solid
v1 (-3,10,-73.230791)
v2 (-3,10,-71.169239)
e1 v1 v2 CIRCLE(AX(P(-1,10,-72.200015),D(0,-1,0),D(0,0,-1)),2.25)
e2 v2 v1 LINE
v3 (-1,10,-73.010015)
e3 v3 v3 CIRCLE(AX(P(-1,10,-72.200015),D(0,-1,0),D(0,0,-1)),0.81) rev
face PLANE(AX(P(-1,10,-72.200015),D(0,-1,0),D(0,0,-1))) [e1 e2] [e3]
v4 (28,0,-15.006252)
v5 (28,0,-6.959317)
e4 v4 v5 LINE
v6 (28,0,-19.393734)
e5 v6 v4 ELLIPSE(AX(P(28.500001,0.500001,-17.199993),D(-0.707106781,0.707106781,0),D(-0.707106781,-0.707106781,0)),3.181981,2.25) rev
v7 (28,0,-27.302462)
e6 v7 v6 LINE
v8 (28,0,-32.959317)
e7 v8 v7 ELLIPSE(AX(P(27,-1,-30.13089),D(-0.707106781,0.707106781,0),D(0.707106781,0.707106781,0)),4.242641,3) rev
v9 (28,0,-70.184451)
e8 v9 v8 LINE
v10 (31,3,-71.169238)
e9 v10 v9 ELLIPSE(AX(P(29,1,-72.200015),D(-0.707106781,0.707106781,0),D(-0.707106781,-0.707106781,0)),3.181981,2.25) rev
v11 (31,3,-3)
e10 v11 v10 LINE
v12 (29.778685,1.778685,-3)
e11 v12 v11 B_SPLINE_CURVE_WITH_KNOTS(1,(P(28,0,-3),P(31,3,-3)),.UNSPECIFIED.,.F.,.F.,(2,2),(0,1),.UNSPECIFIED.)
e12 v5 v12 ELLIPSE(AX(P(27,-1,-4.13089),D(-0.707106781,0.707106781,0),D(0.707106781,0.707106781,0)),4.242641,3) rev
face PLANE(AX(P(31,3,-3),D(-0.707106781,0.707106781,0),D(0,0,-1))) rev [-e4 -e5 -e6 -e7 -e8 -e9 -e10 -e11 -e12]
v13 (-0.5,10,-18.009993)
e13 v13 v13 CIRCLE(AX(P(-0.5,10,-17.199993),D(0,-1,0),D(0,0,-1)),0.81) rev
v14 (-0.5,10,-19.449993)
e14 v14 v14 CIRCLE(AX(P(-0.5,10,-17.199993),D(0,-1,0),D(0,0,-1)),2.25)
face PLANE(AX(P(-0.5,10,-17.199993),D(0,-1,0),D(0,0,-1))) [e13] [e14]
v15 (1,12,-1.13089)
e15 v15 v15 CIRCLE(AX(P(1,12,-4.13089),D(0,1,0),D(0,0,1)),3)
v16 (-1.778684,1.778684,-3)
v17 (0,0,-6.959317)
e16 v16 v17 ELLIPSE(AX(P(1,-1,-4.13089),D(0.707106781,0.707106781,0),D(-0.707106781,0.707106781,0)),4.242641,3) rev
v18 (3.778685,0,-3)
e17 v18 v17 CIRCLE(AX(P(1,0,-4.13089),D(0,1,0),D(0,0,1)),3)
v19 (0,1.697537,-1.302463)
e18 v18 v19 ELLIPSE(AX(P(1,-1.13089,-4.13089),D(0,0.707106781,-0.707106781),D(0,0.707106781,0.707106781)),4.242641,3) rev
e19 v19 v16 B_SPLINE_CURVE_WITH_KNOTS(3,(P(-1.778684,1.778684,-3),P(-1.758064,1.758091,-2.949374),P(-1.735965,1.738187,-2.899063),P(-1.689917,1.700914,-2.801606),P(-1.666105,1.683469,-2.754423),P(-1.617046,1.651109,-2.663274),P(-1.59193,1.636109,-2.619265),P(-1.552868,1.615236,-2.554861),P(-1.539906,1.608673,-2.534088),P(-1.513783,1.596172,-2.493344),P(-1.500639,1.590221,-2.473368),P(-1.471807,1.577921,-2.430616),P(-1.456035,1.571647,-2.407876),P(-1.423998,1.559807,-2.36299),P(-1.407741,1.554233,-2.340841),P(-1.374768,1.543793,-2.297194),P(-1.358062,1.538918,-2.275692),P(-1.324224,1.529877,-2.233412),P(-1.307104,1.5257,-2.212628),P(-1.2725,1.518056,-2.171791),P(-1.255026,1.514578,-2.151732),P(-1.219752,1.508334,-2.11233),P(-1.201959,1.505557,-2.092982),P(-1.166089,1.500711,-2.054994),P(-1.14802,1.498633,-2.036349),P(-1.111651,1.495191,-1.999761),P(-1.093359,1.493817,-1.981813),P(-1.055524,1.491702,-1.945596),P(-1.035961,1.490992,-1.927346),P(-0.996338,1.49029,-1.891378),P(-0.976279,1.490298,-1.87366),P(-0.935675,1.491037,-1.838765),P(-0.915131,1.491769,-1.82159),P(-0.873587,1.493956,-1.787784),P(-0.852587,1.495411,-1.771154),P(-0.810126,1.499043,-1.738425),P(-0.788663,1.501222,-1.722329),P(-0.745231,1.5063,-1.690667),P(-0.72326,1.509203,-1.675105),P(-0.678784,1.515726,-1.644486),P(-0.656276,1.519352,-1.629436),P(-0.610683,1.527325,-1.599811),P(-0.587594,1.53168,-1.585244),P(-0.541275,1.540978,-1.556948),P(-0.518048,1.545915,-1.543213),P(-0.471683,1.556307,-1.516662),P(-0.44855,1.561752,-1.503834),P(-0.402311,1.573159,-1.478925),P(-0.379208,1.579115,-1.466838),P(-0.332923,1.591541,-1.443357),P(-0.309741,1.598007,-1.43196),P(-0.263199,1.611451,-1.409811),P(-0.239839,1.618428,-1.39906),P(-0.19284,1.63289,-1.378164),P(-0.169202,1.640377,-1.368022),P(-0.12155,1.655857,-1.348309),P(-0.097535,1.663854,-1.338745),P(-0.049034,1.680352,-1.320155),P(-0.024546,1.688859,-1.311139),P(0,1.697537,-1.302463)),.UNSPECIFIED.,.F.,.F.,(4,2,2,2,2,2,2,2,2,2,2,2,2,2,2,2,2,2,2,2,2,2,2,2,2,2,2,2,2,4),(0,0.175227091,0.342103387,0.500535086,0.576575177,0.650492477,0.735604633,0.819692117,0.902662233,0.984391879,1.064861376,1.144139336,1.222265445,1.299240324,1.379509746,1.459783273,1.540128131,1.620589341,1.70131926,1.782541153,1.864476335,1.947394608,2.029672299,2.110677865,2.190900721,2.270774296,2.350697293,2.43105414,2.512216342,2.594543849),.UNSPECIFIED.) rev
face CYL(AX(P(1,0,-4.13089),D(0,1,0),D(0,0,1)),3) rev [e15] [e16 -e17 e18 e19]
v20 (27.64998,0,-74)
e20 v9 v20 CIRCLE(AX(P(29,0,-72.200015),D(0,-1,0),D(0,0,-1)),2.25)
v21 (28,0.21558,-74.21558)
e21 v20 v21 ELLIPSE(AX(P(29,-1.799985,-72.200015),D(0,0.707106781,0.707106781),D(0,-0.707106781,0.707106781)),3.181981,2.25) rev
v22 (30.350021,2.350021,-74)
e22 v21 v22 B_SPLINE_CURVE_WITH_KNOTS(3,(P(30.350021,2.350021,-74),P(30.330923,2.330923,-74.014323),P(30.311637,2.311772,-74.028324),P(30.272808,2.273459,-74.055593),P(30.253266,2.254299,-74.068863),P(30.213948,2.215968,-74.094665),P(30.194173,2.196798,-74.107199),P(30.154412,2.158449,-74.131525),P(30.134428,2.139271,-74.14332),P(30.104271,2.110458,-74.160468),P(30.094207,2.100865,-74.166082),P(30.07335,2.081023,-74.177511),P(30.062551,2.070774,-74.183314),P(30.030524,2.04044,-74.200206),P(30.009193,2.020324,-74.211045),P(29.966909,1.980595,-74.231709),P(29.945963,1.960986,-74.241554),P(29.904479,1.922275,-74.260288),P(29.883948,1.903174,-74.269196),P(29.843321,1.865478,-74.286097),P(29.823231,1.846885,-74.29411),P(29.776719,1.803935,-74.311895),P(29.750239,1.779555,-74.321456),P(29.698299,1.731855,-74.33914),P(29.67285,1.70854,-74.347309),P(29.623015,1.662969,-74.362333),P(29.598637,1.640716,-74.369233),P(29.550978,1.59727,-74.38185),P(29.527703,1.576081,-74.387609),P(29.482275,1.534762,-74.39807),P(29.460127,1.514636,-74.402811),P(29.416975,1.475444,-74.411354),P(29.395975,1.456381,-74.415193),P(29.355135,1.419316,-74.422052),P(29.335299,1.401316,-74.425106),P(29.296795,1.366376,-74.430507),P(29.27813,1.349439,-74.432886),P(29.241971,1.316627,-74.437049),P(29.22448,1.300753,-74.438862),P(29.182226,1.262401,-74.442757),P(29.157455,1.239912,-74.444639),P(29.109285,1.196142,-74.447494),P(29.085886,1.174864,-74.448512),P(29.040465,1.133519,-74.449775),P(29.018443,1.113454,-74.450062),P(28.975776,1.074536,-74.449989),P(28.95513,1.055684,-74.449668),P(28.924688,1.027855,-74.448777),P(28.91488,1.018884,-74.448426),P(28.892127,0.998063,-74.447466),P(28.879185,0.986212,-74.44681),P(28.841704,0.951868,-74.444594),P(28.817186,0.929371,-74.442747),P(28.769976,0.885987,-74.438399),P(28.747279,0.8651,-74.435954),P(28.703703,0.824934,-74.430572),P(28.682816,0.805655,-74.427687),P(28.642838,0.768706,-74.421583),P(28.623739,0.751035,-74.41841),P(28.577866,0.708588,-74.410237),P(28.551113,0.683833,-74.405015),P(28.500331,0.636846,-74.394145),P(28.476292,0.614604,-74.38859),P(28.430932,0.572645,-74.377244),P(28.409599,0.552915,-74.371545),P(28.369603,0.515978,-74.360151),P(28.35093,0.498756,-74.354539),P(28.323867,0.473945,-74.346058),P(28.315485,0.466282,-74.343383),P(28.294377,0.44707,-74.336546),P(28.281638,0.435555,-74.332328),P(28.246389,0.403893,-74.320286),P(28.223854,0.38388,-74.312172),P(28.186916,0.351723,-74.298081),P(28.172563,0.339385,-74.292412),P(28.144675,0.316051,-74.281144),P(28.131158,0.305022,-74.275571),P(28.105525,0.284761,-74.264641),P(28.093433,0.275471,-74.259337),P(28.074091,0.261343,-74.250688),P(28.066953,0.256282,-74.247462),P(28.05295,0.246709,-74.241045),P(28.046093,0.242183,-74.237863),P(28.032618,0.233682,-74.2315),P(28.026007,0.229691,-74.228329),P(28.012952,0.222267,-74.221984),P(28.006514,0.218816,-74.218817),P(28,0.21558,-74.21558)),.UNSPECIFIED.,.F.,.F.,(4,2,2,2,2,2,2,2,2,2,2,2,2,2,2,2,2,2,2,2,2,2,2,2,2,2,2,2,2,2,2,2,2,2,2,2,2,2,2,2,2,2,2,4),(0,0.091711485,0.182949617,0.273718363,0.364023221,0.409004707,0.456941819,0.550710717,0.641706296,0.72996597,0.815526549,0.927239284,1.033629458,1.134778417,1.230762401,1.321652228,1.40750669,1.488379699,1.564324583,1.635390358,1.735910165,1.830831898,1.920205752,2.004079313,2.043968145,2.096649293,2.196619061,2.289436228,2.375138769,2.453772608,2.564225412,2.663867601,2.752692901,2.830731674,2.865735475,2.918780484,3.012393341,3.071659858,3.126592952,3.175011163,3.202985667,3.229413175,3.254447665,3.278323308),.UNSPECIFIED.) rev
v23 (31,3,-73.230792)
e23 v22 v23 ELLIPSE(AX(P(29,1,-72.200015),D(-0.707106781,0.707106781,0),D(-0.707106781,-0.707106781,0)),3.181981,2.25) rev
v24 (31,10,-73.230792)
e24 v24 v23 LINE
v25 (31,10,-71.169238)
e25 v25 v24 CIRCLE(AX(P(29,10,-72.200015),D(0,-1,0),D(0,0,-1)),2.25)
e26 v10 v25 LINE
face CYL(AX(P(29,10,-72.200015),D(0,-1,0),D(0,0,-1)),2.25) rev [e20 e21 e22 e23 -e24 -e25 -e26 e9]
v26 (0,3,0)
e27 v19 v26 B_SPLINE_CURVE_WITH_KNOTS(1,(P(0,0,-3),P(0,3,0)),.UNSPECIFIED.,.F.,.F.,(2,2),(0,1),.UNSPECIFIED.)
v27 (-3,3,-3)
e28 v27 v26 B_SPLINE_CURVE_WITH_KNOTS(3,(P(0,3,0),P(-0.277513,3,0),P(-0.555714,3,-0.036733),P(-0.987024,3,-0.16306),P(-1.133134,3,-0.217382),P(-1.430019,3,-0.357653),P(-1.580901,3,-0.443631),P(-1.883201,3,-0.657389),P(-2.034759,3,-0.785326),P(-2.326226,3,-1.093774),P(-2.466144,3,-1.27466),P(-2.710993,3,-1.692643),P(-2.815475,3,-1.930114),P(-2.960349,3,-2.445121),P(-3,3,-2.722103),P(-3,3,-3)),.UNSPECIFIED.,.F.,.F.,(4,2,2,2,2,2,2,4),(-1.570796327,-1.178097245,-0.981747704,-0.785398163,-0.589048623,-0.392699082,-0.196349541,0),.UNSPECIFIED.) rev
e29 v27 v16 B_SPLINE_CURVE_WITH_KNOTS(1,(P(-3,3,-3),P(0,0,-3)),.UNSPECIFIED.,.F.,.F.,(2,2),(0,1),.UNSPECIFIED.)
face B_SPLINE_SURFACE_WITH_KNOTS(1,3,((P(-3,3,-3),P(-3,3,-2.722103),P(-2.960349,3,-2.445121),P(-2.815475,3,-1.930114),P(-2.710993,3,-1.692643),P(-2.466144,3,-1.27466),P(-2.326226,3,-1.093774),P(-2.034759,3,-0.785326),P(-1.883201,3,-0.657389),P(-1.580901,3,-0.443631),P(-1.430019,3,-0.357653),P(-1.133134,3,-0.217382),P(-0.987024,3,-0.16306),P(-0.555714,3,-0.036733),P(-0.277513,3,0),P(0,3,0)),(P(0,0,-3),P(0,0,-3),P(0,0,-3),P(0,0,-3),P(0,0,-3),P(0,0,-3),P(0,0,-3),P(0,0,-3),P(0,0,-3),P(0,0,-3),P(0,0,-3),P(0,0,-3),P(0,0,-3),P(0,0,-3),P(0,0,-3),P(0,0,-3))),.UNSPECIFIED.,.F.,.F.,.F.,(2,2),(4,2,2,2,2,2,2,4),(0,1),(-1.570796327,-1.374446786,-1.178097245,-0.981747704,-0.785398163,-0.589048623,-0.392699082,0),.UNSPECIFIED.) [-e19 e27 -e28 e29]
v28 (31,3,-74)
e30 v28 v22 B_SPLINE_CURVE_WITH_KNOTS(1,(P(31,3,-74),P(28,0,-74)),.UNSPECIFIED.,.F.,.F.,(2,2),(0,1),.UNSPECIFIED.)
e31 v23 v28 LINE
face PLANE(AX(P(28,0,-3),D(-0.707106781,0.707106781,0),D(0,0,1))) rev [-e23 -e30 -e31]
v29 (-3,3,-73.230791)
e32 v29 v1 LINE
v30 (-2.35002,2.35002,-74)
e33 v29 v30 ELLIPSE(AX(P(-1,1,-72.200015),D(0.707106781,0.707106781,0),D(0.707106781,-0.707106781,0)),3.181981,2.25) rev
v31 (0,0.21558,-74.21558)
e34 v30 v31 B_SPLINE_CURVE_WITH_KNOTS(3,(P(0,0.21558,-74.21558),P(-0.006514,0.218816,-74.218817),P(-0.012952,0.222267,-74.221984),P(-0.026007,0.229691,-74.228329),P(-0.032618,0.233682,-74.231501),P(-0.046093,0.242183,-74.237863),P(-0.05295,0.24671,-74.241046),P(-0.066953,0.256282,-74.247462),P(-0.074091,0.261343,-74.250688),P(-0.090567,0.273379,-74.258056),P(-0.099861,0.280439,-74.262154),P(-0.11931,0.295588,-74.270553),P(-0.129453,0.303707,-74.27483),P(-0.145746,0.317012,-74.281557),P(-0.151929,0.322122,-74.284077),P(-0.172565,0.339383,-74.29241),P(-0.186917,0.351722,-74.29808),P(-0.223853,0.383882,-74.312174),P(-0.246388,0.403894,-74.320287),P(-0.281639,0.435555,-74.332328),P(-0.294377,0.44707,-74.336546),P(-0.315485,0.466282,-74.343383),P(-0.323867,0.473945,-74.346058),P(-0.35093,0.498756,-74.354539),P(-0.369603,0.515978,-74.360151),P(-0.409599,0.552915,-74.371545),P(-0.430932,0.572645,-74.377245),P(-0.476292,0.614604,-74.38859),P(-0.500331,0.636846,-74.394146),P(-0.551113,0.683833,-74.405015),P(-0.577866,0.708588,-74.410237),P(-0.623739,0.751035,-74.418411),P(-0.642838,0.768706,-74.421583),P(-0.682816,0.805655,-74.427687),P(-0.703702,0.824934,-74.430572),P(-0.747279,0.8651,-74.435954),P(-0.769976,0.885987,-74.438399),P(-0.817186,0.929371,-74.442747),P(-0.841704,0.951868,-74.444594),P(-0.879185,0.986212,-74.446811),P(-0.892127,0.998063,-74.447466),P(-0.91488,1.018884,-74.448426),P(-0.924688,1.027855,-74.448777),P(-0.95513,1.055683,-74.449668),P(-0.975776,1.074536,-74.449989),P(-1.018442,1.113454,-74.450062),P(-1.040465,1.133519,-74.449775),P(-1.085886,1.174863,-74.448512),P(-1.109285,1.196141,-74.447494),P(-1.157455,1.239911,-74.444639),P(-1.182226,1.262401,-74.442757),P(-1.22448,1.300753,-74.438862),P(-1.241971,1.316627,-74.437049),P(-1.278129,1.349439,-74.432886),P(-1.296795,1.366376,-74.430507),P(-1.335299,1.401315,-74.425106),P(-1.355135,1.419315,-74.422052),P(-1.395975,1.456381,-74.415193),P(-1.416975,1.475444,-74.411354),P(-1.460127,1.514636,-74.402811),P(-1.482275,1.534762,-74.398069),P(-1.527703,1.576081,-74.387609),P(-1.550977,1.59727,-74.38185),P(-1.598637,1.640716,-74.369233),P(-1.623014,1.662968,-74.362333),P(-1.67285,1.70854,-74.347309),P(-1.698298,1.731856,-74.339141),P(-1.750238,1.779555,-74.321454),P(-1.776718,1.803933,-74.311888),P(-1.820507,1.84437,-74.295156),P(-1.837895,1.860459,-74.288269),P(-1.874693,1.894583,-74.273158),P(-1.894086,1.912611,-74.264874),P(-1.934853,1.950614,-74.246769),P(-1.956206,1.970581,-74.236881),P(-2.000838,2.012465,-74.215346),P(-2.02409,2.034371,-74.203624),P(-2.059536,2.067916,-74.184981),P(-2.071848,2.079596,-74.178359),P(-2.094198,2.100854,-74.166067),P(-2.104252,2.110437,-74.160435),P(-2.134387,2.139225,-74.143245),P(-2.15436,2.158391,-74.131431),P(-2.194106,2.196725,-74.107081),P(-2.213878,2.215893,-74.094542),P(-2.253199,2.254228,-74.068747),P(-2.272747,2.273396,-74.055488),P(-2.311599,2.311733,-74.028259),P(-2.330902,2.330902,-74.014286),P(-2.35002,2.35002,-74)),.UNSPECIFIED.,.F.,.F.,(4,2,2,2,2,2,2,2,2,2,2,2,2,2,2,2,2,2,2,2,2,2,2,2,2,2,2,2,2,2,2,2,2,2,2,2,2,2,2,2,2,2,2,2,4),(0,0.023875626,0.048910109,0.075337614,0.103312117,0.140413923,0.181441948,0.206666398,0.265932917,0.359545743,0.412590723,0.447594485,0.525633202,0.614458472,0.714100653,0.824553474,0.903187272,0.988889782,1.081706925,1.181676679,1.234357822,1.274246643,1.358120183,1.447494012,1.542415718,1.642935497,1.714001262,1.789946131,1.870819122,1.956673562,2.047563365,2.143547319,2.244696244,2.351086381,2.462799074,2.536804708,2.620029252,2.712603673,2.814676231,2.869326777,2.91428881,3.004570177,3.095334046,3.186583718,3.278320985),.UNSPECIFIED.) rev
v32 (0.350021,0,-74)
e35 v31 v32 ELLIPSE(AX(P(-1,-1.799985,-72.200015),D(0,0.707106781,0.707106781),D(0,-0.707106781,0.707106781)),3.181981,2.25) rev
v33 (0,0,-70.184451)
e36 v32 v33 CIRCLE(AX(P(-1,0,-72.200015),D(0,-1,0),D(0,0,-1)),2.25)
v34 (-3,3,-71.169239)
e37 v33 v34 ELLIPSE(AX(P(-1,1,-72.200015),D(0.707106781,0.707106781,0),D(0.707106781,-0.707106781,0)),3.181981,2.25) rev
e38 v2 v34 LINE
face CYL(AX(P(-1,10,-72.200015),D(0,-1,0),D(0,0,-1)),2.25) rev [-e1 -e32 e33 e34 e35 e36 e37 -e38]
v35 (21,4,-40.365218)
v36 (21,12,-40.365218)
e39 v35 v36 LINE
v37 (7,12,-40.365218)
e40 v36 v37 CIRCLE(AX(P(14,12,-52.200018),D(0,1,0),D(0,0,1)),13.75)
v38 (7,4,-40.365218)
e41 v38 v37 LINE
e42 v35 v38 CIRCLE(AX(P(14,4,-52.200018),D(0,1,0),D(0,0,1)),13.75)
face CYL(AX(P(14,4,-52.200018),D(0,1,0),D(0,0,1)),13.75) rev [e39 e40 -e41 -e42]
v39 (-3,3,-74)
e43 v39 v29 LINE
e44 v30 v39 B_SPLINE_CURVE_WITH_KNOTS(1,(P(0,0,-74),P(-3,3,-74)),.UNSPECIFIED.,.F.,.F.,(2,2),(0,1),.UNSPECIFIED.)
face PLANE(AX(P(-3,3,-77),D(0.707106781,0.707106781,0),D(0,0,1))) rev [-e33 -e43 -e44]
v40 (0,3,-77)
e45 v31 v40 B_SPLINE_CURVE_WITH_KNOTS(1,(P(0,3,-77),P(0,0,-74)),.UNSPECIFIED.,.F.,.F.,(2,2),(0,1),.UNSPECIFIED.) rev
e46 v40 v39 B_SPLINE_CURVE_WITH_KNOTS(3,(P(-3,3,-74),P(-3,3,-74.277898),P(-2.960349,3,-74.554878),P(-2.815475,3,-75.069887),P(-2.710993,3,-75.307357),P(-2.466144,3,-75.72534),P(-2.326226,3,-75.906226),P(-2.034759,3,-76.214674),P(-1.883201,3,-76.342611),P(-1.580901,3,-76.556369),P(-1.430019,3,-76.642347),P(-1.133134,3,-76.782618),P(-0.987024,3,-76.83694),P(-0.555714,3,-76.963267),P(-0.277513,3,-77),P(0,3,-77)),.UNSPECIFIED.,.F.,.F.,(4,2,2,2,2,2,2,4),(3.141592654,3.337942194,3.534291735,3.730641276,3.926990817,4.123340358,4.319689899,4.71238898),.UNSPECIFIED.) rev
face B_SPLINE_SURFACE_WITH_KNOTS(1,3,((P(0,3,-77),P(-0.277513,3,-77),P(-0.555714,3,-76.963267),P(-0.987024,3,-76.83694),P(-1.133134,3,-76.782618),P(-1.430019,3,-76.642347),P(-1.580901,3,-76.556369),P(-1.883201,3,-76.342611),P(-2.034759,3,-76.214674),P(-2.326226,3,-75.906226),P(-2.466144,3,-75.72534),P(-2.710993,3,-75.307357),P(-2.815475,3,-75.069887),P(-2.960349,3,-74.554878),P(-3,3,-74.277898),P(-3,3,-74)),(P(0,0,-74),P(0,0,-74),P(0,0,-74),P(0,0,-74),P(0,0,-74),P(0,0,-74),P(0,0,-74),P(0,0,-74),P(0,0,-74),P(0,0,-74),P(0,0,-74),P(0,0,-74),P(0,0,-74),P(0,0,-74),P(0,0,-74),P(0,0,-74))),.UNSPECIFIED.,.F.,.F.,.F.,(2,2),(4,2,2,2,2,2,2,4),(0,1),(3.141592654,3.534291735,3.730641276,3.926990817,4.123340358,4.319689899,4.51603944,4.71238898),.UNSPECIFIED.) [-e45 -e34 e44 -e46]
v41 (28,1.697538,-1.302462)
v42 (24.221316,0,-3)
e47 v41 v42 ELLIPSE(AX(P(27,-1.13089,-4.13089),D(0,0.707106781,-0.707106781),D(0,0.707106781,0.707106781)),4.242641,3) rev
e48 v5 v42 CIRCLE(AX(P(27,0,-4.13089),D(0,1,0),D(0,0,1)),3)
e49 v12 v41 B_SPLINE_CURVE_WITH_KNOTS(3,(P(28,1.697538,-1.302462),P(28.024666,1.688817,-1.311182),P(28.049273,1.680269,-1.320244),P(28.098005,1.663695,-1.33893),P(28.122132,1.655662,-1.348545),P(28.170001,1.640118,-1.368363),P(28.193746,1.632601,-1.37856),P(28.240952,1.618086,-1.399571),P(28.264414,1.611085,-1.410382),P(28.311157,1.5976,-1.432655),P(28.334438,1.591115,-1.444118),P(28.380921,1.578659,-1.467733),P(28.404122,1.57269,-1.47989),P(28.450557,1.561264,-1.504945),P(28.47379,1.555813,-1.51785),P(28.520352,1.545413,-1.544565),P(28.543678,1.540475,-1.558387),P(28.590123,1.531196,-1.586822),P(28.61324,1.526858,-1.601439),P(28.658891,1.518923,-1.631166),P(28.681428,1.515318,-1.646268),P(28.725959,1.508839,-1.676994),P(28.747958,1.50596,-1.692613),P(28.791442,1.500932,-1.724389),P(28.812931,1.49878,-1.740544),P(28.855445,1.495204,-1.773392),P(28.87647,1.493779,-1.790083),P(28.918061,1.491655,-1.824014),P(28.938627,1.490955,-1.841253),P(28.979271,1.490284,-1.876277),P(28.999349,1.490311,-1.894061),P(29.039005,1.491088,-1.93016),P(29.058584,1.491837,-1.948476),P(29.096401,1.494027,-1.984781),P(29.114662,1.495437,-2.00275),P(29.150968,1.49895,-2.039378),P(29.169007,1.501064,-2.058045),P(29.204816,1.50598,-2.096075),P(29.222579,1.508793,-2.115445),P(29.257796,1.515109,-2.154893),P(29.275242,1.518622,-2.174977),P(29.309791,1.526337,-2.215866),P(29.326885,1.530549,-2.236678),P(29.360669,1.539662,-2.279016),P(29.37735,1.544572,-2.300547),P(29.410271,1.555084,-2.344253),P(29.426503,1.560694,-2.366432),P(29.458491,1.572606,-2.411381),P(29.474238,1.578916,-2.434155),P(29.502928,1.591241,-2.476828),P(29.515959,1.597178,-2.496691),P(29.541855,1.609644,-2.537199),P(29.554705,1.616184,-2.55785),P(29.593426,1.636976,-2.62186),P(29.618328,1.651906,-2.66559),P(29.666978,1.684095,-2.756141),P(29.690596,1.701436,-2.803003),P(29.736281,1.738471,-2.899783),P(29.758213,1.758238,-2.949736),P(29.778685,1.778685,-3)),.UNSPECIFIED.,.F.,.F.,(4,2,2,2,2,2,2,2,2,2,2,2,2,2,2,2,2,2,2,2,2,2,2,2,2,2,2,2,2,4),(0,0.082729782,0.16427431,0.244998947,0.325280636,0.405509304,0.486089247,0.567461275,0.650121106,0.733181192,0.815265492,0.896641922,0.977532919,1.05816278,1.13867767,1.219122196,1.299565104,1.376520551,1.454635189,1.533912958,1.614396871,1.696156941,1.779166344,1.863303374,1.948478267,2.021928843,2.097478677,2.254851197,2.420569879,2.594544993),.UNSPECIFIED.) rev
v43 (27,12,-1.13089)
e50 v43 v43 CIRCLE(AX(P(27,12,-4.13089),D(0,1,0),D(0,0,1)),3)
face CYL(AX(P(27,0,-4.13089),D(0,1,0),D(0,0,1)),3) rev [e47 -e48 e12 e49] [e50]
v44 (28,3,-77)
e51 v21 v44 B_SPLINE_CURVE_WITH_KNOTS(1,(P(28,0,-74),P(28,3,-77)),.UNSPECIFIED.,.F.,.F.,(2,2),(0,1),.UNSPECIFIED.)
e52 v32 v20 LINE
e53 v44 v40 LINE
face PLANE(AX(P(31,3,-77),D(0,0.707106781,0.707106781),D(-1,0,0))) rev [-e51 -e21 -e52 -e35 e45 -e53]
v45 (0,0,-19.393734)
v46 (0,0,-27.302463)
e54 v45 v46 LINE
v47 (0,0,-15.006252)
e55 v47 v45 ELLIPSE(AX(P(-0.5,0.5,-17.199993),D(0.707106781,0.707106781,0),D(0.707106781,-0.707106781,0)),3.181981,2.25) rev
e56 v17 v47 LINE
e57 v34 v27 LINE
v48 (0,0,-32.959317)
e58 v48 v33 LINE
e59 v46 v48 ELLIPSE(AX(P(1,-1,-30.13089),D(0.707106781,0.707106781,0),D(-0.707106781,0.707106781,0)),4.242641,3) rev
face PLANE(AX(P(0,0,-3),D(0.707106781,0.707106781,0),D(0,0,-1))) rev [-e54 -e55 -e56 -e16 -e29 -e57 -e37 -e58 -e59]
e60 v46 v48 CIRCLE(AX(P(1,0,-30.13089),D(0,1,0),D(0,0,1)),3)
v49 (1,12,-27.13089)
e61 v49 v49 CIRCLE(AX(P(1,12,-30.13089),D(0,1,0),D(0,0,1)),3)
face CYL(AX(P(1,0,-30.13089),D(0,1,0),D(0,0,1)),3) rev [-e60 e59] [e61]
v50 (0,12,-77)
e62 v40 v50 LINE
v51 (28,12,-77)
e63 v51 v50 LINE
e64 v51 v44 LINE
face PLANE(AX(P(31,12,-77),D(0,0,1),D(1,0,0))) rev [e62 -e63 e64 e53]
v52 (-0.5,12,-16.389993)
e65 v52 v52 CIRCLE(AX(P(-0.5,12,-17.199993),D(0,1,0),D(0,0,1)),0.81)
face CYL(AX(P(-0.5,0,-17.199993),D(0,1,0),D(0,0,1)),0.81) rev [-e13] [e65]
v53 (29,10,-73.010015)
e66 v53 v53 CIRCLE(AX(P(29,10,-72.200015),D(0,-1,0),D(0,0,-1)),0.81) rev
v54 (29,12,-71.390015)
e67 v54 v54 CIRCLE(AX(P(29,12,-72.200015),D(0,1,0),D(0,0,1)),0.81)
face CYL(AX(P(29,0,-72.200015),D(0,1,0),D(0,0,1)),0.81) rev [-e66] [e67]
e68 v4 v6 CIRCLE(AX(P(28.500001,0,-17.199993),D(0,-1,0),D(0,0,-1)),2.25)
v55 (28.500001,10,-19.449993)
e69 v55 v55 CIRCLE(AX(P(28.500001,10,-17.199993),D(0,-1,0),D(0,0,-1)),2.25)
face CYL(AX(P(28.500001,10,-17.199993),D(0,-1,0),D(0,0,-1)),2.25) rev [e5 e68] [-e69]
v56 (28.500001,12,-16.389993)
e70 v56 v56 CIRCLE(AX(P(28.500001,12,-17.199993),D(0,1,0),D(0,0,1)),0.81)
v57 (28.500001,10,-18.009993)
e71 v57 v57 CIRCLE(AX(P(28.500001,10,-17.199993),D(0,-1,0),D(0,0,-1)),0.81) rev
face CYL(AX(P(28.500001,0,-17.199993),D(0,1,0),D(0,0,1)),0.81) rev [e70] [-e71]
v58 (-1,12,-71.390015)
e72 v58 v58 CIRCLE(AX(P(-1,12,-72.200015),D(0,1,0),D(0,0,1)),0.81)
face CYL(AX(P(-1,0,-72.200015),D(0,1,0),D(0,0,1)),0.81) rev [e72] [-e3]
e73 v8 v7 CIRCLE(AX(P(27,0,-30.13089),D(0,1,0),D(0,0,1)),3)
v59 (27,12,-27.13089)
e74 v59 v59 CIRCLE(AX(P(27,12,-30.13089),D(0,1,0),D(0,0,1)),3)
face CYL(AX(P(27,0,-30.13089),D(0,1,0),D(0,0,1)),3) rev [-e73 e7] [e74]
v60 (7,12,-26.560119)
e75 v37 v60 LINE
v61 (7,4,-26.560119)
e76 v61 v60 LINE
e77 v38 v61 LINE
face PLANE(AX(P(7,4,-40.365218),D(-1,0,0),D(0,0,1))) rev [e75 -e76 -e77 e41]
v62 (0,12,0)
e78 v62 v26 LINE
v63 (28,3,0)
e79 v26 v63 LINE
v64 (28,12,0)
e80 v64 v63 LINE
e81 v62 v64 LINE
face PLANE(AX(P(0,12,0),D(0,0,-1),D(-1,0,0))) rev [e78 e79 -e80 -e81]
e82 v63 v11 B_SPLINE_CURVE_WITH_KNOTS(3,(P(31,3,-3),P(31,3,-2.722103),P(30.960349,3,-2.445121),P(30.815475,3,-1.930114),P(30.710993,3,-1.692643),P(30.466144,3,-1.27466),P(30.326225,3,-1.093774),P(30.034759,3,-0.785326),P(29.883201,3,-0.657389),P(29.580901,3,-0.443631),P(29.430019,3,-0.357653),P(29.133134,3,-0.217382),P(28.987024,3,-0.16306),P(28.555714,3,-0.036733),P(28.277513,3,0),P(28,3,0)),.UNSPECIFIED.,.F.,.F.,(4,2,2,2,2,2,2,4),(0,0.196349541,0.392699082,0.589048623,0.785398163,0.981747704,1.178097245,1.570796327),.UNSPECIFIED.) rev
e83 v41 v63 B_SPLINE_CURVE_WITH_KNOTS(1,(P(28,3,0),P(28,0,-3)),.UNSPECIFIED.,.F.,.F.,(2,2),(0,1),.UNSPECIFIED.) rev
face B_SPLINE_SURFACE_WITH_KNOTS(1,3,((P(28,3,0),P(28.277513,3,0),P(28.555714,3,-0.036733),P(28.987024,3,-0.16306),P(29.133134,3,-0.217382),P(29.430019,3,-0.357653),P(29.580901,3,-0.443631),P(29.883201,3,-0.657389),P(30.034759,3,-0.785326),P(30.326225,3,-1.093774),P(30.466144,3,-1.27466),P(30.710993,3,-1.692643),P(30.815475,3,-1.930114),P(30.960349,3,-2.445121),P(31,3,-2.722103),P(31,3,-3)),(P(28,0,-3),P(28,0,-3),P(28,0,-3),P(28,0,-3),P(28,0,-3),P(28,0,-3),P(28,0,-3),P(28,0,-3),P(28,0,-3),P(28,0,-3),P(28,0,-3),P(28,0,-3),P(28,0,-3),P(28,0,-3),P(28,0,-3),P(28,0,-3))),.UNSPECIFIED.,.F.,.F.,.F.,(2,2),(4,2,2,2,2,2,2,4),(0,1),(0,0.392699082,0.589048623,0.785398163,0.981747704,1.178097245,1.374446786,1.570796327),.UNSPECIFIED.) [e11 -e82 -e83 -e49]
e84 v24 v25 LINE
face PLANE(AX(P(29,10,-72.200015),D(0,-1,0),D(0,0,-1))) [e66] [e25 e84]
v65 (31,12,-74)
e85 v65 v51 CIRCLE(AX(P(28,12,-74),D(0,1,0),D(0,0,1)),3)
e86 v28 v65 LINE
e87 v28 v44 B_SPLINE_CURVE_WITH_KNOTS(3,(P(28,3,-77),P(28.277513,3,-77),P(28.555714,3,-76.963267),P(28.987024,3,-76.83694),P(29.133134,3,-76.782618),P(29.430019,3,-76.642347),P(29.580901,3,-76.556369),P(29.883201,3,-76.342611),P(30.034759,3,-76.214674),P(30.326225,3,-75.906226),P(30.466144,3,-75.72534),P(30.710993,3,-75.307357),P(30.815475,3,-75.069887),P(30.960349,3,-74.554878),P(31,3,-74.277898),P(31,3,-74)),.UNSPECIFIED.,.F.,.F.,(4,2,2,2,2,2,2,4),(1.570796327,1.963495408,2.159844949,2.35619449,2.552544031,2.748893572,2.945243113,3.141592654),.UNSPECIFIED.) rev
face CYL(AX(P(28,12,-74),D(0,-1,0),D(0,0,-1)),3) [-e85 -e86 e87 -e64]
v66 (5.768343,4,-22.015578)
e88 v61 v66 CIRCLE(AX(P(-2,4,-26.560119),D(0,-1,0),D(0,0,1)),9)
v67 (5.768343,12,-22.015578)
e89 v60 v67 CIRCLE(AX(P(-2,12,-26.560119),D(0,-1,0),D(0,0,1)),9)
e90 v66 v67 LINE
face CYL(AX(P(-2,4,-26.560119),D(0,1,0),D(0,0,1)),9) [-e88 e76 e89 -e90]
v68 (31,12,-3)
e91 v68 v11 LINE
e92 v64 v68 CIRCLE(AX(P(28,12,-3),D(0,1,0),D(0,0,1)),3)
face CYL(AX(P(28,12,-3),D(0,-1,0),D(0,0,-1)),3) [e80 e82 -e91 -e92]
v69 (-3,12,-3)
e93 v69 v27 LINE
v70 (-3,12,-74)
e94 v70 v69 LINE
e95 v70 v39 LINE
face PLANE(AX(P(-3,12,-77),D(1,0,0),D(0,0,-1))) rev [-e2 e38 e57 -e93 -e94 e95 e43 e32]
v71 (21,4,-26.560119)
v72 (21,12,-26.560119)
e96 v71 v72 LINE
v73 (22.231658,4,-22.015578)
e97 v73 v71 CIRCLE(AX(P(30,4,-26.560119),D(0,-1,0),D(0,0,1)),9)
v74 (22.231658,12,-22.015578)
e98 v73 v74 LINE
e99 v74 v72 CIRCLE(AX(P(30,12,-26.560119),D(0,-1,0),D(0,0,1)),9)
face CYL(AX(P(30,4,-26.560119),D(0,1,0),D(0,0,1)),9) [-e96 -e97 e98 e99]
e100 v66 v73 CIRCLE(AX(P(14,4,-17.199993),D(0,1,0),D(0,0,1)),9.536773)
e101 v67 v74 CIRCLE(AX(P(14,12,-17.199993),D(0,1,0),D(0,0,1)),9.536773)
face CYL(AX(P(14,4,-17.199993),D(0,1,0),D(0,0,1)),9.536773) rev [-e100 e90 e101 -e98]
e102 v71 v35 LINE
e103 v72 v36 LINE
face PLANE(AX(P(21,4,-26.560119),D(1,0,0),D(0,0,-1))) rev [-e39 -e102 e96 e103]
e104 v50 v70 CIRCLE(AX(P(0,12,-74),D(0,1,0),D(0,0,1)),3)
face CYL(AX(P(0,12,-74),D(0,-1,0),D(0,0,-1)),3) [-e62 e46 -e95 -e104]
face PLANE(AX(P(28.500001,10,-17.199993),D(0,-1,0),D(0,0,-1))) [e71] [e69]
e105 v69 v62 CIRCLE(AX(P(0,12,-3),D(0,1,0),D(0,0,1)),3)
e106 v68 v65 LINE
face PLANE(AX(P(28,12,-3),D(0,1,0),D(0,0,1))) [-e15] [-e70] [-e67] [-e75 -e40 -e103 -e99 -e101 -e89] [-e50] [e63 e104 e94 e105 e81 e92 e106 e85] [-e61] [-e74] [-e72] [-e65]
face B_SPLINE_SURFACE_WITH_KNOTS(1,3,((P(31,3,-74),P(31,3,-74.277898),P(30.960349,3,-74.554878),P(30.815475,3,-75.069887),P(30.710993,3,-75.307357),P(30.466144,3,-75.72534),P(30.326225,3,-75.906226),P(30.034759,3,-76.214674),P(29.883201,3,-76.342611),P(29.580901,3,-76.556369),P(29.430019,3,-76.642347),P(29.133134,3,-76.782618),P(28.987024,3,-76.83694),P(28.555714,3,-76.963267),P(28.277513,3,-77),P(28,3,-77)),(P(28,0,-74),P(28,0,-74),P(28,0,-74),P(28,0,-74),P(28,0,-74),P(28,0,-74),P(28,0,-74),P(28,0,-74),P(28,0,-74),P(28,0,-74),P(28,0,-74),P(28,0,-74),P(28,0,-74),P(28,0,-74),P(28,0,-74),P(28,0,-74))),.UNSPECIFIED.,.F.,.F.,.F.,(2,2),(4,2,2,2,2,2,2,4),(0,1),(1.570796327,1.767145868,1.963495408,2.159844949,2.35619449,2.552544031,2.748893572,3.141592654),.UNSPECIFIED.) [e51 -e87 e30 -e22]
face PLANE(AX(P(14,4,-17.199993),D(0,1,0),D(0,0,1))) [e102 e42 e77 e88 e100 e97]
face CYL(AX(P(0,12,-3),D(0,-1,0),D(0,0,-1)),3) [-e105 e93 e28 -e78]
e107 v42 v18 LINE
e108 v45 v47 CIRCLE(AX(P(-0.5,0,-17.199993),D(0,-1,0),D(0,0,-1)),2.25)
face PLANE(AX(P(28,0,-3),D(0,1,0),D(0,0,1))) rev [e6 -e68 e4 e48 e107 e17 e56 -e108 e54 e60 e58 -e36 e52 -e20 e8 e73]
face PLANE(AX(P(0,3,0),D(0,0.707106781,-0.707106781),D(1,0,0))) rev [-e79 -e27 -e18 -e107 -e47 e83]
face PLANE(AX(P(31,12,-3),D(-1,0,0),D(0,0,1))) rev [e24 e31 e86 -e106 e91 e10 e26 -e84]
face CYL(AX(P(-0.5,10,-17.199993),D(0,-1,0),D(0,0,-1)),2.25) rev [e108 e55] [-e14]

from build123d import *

# Parameters (mm, degrees)
EXTRUDE_1_DEPTH     = 12
SKETCH_2_R          = 3
SKETCH_2_R_2        = 0.81
CUT_EXTRUDE_1_DEPTH = 12
CUT_EXTRUDE_2_DEPTH = 8
FILLET_1_R          = 3
SKETCH_4_R          = 2.25
CUT_EXTRUDE_3_DEPTH = 10
CHAMFER_3_SIZE      = 3


with BuildPart() as part:
    # 草图1 → 凸台-拉伸1 (new body)
    with BuildSketch(Plane(origin=(0, 0, 0), x_dir=(1, 0, 0), z_dir=(0, 1, 0))):
        with BuildLine():
            Line((0, 0), (28, 0))
            ThreePointArc((28, 0), (30.121320344, 0.878679656), (31, 3))
            Line((31, 3), (31, 77))
            Line((31, 77), (-3, 77))
            Line((-3, 77), (-3, 3))
            ThreePointArc((-3, 3), (-2.121320344, 0.878679656), (0, 0))
        make_face()
    extrude(amount=EXTRUDE_1_DEPTH)

    # 草图2 → 切除-拉伸1 (cut)
    with BuildSketch(Plane(origin=(14.000000253, 12, -382.2), x_dir=(1, 0, 0), z_dir=(0, 1, 0))):
        with Locations(Location((13, -352.069110398, 0), (0, 0, 270))):
            Circle(SKETCH_2_R)
        with Locations(Location((-13, -352.069110398, 0), (0, 0, 270))):
            Circle(SKETCH_2_R)
        with Locations(Location((13, -378.069110398, 0), (0, 0, 270))):
            Circle(SKETCH_2_R)
        with Locations(Location((-13, -378.069110398, 0), (0, 0, 270))):
            Circle(SKETCH_2_R)
        with Locations(Location((-15.000000143, -309.999984702, 0), (0, 0, 270))):
            Circle(SKETCH_2_R_2)
        with Locations(Location((15.000000143, -309.999984702, 0), (0, 0, 270))):
            Circle(SKETCH_2_R_2)
        with Locations(Location((14.500000253, -365.000006616, 0), (0, 0, 270))):
            Circle(SKETCH_2_R_2)
        with Locations(Location((-14.500000253, -365.000006616, 0), (0, 0, 270))):
            Circle(SKETCH_2_R_2)
    extrude(amount=-CUT_EXTRUDE_1_DEPTH, mode=Mode.SUBTRACT)

    # 草图3 → 切除-拉伸2 (cut)
    with BuildSketch(Plane(origin=(14.000000253, 12, -382.2), x_dir=(1, 0, 0), z_dir=(0, 1, 0))):
        with BuildLine():
            Line((-7.000000134, -341.834781862), (-7.000000134, -355.639881164))
            ThreePointArc((-7.000000134, -355.639881164), (-7.313370109, -357.994123887), (-8.231657645, -360.184422392))
            ThreePointArc((-8.231657645, -360.184422392), (0, -374.536779603), (8.231657645, -360.184422392))
            ThreePointArc((8.231657645, -360.184422392), (7.313370109, -357.994123887), (7.000000134, -355.639881164))
            Line((7.000000134, -355.639881164), (7.000000134, -341.834782031))
            ThreePointArc((7.000000134, -341.834782031), (3.09e-07, -316.249981647), (-7.000000134, -341.834781862))
        make_face()
    extrude(amount=-CUT_EXTRUDE_2_DEPTH, mode=Mode.SUBTRACT)

    # 圆角1
    fillet_1_edges = [part.edges().sort_by_distance(p)[0] for p in [
        (-3, 6, -77),
        (31, 6, -77),
    ]]
    fillet(fillet_1_edges, radius=FILLET_1_R)

    # 草图4 → 切除-拉伸3 (cut)
    with BuildSketch(Plane.XZ):
        with Locations(Location((-0.5, -17.199993384, 0), (0, 0, 270))):
            Circle(SKETCH_4_R)
        with Locations(Location((28.500000507, -17.199993384, 0), (0, 0, 270))):
            Circle(SKETCH_4_R)
        with Locations((-0.99999989, -72.200015298)):
            Circle(SKETCH_4_R)
        with Locations((29.000000396, -72.200015298)):
            Circle(SKETCH_4_R)
    extrude(amount=-CUT_EXTRUDE_3_DEPTH, mode=Mode.SUBTRACT)

    # 倒角3
    # the kernel refuses this chamfer: 3 mm, written as the material it takes off along each edge
    with BuildSketch(Plane(origin=(0, 0, -74), x_dir=(-1, 0, 0), z_dir=(0, 0, 1))) as chamfer_3_piece_1:
        with BuildLine():
            Line((3 - CHAMFER_3_SIZE, 0), (3.084852814, -3.084852814))
            Line((3.084852814, -3.084852814), (3.144852814, -3.084852814))
            ThreePointArc((3.144852814, -3.084852814), (3.06, -1.542426407), (3.06, 0))
            Line((3.06, 0), (3, 0.06))
            Line((3, 0.06), (0, 0.142518829))
            Line((0, 0.142518829), (3 - CHAMFER_3_SIZE, 0))
        make_face()
    revolve(axis=Axis((0, 0, -74), (0, -1, 0)), revolution_arc=90, mode=Mode.SUBTRACT)
    with BuildSketch(Plane(origin=(-3, 0, -74), x_dir=(1, 0, 0), z_dir=(0, 0, 1))) as chamfer_3_piece_2:
        with BuildLine():
            Line((3.084852814, -0.084852814), (-0.084852814, 3.084852814))
            Line((-0.084852814, 3.084852814), (-0.144852814, 3.084852814))
            ThreePointArc((-0.144852814, 3.084852814), (-0.06, 1.542426407), (-0.06, 0))
            Line((-0.06, 0), (0, -0.06))
            ThreePointArc((0, -0.06), (1.542426407, -0.06), (3.084852814, -0.144852814))
            Line((3.084852814, -0.144852814), (3.084852814, -0.084852814))
        make_face()
    extrude(amount=8.484257474, mode=Mode.SUBTRACT)
    with BuildSketch(Plane(origin=(31, 0, -65.515743509), x_dir=(-1, 0, 0), z_dir=(0, 0, -1))) as chamfer_3_piece_3:
        with BuildLine():
            Line((3.084852814, -0.084852814), (-0.084852814, 3.084852814))
            Line((-0.084852814, 3.084852814), (-0.144852814, 3.084852814))
            ThreePointArc((-0.144852814, 3.084852814), (-0.06, 1.542426407), (-0.06, 0))
            Line((-0.06, 0), (0, -0.06))
            ThreePointArc((0, -0.06), (1.542426407, -0.06), (3.084852814, -0.144852814))
            Line((3.084852814, -0.144852814), (3.084852814, -0.084852814))
        make_face()
    extrude(amount=8.484256491, mode=Mode.SUBTRACT)
    with BuildSketch(Plane(origin=(28, 0, -74), x_dir=(1, 0, 0), z_dir=(0, 0, 1))) as chamfer_3_piece_4:
        with BuildLine():
            Line((3 - CHAMFER_3_SIZE, 0), (3.084852814, 3.084852814))
            Line((3.084852814, 3.084852814), (3.144852814, 3.084852814))
            ThreePointArc((3.144852814, 3.084852814), (3.06, 1.542426407), (3.06, 0))
            Line((3.06, 0), (3, -0.06))
            Line((3, -0.06), (0, -0.142518829))
            Line((0, -0.142518829), (3 - CHAMFER_3_SIZE, 0))
        make_face()
    revolve(axis=Axis((28, 0, -74), (0, 1, 0)), revolution_arc=90, mode=Mode.SUBTRACT)
    with BuildSketch(Plane(origin=(28, 0, -77), x_dir=(0, 0, 1), z_dir=(-1, 0, 0))) as chamfer_3_piece_5:
        with BuildLine():
            Line((3.084852814, -0.084852814), (-0.084852814, 3.084852814))
            Line((-0.084852814, 3.084852814), (-0.144852814, 3.084852814))
            ThreePointArc((-0.144852814, 3.084852814), (-0.06, 1.542426407), (-0.06, 0))
            Line((-0.06, 0), (0, -0.06))
            ThreePointArc((0, -0.06), (1.542426407, -0.06), (3.084852814, -0.144852814))
            Line((3.084852814, -0.144852814), (3.084852814, -0.084852814))
        make_face()
    extrude(amount=28, mode=Mode.SUBTRACT)
    # the kernel refuses this chamfer: 3 mm, written as the material it takes off along each edge
    with BuildSketch(Plane(origin=(-3, 0, -73.23079149), x_dir=(0, 1, 0), z_dir=(0, 0, 1))) as chamfer_3_2_piece_1:
        with BuildLine():
            Line((3.084852814, 0.084852814), (-0.084852814, -3.084852814))
            Line((-0.084852814, -3.084852814), (-0.144852814, -3.084852814))
            ThreePointArc((-0.144852814, -3.084852814), (-0.06, -1.542426407), (-0.06, 0))
            Line((-0.06, 0), (0, 0.06))
            ThreePointArc((0, 0.06), (1.542426407, 0.06), (3.084852814, 0.144852814))
            Line((3.084852814, 0.144852814), (3.084852814, 0.084852814))
        make_face()
    extrude(amount=70.23079149, mode=Mode.SUBTRACT)
    with BuildSketch(Plane(origin=(0, 0, -3), x_dir=(-1, 0, 0), z_dir=(0, 0, -1))) as chamfer_3_2_piece_2:
        with BuildLine():
            Line((3 - CHAMFER_3_SIZE, 0), (3.084852814, 3.084852814))
            Line((3.084852814, 3.084852814), (3.144852814, 3.084852814))
            ThreePointArc((3.144852814, 3.084852814), (3.06, 1.542426407), (3.06, 0))
            Line((3.06, 0), (3, -0.06))
            Line((3, -0.06), (0, -0.142518829))
            Line((0, -0.142518829), (3 - CHAMFER_3_SIZE, 0))
        make_face()
    revolve(axis=Axis((0, 0, -3), (0, 1, 0)), revolution_arc=90, mode=Mode.SUBTRACT)
    with BuildSketch(Plane(origin=(0, 0, 0), x_dir=(0, 0, -1), z_dir=(1, 0, 0))) as chamfer_3_2_piece_3:
        with BuildLine():
            Line((3.084852814, -0.084852814), (-0.084852814, 3.084852814))
            Line((-0.084852814, 3.084852814), (-0.144852814, 3.084852814))
            ThreePointArc((-0.144852814, 3.084852814), (-0.06, 1.542426407), (-0.06, 0))
            Line((-0.06, 0), (0, -0.06))
            ThreePointArc((0, -0.06), (1.542426407, -0.06), (3.084852814, -0.144852814))
            Line((3.084852814, -0.144852814), (3.084852814, -0.084852814))
        make_face()
    extrude(amount=28, mode=Mode.SUBTRACT)
    with BuildSketch(Plane(origin=(28, 0, -3), x_dir=(0, 0, 1), z_dir=(-1, 0, 0))) as chamfer_3_2_piece_4:
        with BuildLine():
            Line((3 - CHAMFER_3_SIZE, 0), (3.084852814, 3.084852814))
            Line((3.084852814, 3.084852814), (3.144852814, 3.084852814))
            ThreePointArc((3.144852814, 3.084852814), (3.06, 1.542426407), (3.06, 0))
            Line((3.06, 0), (3, -0.06))
            Line((3, -0.06), (0, -0.142518829))
            Line((0, -0.142518829), (3 - CHAMFER_3_SIZE, 0))
        make_face()
    revolve(axis=Axis((28, 0, -3), (0, 1, 0)), revolution_arc=90, mode=Mode.SUBTRACT)
    with BuildSketch(Plane(origin=(31, 0, -3), x_dir=(-1, 0, 0), z_dir=(0, 0, -1))) as chamfer_3_2_piece_5:
        with BuildLine():
            Line((3.084852814, -0.084852814), (-0.084852814, 3.084852814))
            Line((-0.084852814, 3.084852814), (-0.144852814, 3.084852814))
            ThreePointArc((-0.144852814, 3.084852814), (-0.06, 1.542426407), (-0.06, 0))
            Line((-0.06, 0), (0, -0.06))
            ThreePointArc((0, -0.06), (1.542426407, -0.06), (3.084852814, -0.144852814))
            Line((3.084852814, -0.144852814), (3.084852814, -0.084852814))
        make_face()
    extrude(amount=70.230792473, mode=Mode.SUBTRACT)


solid = part.part
